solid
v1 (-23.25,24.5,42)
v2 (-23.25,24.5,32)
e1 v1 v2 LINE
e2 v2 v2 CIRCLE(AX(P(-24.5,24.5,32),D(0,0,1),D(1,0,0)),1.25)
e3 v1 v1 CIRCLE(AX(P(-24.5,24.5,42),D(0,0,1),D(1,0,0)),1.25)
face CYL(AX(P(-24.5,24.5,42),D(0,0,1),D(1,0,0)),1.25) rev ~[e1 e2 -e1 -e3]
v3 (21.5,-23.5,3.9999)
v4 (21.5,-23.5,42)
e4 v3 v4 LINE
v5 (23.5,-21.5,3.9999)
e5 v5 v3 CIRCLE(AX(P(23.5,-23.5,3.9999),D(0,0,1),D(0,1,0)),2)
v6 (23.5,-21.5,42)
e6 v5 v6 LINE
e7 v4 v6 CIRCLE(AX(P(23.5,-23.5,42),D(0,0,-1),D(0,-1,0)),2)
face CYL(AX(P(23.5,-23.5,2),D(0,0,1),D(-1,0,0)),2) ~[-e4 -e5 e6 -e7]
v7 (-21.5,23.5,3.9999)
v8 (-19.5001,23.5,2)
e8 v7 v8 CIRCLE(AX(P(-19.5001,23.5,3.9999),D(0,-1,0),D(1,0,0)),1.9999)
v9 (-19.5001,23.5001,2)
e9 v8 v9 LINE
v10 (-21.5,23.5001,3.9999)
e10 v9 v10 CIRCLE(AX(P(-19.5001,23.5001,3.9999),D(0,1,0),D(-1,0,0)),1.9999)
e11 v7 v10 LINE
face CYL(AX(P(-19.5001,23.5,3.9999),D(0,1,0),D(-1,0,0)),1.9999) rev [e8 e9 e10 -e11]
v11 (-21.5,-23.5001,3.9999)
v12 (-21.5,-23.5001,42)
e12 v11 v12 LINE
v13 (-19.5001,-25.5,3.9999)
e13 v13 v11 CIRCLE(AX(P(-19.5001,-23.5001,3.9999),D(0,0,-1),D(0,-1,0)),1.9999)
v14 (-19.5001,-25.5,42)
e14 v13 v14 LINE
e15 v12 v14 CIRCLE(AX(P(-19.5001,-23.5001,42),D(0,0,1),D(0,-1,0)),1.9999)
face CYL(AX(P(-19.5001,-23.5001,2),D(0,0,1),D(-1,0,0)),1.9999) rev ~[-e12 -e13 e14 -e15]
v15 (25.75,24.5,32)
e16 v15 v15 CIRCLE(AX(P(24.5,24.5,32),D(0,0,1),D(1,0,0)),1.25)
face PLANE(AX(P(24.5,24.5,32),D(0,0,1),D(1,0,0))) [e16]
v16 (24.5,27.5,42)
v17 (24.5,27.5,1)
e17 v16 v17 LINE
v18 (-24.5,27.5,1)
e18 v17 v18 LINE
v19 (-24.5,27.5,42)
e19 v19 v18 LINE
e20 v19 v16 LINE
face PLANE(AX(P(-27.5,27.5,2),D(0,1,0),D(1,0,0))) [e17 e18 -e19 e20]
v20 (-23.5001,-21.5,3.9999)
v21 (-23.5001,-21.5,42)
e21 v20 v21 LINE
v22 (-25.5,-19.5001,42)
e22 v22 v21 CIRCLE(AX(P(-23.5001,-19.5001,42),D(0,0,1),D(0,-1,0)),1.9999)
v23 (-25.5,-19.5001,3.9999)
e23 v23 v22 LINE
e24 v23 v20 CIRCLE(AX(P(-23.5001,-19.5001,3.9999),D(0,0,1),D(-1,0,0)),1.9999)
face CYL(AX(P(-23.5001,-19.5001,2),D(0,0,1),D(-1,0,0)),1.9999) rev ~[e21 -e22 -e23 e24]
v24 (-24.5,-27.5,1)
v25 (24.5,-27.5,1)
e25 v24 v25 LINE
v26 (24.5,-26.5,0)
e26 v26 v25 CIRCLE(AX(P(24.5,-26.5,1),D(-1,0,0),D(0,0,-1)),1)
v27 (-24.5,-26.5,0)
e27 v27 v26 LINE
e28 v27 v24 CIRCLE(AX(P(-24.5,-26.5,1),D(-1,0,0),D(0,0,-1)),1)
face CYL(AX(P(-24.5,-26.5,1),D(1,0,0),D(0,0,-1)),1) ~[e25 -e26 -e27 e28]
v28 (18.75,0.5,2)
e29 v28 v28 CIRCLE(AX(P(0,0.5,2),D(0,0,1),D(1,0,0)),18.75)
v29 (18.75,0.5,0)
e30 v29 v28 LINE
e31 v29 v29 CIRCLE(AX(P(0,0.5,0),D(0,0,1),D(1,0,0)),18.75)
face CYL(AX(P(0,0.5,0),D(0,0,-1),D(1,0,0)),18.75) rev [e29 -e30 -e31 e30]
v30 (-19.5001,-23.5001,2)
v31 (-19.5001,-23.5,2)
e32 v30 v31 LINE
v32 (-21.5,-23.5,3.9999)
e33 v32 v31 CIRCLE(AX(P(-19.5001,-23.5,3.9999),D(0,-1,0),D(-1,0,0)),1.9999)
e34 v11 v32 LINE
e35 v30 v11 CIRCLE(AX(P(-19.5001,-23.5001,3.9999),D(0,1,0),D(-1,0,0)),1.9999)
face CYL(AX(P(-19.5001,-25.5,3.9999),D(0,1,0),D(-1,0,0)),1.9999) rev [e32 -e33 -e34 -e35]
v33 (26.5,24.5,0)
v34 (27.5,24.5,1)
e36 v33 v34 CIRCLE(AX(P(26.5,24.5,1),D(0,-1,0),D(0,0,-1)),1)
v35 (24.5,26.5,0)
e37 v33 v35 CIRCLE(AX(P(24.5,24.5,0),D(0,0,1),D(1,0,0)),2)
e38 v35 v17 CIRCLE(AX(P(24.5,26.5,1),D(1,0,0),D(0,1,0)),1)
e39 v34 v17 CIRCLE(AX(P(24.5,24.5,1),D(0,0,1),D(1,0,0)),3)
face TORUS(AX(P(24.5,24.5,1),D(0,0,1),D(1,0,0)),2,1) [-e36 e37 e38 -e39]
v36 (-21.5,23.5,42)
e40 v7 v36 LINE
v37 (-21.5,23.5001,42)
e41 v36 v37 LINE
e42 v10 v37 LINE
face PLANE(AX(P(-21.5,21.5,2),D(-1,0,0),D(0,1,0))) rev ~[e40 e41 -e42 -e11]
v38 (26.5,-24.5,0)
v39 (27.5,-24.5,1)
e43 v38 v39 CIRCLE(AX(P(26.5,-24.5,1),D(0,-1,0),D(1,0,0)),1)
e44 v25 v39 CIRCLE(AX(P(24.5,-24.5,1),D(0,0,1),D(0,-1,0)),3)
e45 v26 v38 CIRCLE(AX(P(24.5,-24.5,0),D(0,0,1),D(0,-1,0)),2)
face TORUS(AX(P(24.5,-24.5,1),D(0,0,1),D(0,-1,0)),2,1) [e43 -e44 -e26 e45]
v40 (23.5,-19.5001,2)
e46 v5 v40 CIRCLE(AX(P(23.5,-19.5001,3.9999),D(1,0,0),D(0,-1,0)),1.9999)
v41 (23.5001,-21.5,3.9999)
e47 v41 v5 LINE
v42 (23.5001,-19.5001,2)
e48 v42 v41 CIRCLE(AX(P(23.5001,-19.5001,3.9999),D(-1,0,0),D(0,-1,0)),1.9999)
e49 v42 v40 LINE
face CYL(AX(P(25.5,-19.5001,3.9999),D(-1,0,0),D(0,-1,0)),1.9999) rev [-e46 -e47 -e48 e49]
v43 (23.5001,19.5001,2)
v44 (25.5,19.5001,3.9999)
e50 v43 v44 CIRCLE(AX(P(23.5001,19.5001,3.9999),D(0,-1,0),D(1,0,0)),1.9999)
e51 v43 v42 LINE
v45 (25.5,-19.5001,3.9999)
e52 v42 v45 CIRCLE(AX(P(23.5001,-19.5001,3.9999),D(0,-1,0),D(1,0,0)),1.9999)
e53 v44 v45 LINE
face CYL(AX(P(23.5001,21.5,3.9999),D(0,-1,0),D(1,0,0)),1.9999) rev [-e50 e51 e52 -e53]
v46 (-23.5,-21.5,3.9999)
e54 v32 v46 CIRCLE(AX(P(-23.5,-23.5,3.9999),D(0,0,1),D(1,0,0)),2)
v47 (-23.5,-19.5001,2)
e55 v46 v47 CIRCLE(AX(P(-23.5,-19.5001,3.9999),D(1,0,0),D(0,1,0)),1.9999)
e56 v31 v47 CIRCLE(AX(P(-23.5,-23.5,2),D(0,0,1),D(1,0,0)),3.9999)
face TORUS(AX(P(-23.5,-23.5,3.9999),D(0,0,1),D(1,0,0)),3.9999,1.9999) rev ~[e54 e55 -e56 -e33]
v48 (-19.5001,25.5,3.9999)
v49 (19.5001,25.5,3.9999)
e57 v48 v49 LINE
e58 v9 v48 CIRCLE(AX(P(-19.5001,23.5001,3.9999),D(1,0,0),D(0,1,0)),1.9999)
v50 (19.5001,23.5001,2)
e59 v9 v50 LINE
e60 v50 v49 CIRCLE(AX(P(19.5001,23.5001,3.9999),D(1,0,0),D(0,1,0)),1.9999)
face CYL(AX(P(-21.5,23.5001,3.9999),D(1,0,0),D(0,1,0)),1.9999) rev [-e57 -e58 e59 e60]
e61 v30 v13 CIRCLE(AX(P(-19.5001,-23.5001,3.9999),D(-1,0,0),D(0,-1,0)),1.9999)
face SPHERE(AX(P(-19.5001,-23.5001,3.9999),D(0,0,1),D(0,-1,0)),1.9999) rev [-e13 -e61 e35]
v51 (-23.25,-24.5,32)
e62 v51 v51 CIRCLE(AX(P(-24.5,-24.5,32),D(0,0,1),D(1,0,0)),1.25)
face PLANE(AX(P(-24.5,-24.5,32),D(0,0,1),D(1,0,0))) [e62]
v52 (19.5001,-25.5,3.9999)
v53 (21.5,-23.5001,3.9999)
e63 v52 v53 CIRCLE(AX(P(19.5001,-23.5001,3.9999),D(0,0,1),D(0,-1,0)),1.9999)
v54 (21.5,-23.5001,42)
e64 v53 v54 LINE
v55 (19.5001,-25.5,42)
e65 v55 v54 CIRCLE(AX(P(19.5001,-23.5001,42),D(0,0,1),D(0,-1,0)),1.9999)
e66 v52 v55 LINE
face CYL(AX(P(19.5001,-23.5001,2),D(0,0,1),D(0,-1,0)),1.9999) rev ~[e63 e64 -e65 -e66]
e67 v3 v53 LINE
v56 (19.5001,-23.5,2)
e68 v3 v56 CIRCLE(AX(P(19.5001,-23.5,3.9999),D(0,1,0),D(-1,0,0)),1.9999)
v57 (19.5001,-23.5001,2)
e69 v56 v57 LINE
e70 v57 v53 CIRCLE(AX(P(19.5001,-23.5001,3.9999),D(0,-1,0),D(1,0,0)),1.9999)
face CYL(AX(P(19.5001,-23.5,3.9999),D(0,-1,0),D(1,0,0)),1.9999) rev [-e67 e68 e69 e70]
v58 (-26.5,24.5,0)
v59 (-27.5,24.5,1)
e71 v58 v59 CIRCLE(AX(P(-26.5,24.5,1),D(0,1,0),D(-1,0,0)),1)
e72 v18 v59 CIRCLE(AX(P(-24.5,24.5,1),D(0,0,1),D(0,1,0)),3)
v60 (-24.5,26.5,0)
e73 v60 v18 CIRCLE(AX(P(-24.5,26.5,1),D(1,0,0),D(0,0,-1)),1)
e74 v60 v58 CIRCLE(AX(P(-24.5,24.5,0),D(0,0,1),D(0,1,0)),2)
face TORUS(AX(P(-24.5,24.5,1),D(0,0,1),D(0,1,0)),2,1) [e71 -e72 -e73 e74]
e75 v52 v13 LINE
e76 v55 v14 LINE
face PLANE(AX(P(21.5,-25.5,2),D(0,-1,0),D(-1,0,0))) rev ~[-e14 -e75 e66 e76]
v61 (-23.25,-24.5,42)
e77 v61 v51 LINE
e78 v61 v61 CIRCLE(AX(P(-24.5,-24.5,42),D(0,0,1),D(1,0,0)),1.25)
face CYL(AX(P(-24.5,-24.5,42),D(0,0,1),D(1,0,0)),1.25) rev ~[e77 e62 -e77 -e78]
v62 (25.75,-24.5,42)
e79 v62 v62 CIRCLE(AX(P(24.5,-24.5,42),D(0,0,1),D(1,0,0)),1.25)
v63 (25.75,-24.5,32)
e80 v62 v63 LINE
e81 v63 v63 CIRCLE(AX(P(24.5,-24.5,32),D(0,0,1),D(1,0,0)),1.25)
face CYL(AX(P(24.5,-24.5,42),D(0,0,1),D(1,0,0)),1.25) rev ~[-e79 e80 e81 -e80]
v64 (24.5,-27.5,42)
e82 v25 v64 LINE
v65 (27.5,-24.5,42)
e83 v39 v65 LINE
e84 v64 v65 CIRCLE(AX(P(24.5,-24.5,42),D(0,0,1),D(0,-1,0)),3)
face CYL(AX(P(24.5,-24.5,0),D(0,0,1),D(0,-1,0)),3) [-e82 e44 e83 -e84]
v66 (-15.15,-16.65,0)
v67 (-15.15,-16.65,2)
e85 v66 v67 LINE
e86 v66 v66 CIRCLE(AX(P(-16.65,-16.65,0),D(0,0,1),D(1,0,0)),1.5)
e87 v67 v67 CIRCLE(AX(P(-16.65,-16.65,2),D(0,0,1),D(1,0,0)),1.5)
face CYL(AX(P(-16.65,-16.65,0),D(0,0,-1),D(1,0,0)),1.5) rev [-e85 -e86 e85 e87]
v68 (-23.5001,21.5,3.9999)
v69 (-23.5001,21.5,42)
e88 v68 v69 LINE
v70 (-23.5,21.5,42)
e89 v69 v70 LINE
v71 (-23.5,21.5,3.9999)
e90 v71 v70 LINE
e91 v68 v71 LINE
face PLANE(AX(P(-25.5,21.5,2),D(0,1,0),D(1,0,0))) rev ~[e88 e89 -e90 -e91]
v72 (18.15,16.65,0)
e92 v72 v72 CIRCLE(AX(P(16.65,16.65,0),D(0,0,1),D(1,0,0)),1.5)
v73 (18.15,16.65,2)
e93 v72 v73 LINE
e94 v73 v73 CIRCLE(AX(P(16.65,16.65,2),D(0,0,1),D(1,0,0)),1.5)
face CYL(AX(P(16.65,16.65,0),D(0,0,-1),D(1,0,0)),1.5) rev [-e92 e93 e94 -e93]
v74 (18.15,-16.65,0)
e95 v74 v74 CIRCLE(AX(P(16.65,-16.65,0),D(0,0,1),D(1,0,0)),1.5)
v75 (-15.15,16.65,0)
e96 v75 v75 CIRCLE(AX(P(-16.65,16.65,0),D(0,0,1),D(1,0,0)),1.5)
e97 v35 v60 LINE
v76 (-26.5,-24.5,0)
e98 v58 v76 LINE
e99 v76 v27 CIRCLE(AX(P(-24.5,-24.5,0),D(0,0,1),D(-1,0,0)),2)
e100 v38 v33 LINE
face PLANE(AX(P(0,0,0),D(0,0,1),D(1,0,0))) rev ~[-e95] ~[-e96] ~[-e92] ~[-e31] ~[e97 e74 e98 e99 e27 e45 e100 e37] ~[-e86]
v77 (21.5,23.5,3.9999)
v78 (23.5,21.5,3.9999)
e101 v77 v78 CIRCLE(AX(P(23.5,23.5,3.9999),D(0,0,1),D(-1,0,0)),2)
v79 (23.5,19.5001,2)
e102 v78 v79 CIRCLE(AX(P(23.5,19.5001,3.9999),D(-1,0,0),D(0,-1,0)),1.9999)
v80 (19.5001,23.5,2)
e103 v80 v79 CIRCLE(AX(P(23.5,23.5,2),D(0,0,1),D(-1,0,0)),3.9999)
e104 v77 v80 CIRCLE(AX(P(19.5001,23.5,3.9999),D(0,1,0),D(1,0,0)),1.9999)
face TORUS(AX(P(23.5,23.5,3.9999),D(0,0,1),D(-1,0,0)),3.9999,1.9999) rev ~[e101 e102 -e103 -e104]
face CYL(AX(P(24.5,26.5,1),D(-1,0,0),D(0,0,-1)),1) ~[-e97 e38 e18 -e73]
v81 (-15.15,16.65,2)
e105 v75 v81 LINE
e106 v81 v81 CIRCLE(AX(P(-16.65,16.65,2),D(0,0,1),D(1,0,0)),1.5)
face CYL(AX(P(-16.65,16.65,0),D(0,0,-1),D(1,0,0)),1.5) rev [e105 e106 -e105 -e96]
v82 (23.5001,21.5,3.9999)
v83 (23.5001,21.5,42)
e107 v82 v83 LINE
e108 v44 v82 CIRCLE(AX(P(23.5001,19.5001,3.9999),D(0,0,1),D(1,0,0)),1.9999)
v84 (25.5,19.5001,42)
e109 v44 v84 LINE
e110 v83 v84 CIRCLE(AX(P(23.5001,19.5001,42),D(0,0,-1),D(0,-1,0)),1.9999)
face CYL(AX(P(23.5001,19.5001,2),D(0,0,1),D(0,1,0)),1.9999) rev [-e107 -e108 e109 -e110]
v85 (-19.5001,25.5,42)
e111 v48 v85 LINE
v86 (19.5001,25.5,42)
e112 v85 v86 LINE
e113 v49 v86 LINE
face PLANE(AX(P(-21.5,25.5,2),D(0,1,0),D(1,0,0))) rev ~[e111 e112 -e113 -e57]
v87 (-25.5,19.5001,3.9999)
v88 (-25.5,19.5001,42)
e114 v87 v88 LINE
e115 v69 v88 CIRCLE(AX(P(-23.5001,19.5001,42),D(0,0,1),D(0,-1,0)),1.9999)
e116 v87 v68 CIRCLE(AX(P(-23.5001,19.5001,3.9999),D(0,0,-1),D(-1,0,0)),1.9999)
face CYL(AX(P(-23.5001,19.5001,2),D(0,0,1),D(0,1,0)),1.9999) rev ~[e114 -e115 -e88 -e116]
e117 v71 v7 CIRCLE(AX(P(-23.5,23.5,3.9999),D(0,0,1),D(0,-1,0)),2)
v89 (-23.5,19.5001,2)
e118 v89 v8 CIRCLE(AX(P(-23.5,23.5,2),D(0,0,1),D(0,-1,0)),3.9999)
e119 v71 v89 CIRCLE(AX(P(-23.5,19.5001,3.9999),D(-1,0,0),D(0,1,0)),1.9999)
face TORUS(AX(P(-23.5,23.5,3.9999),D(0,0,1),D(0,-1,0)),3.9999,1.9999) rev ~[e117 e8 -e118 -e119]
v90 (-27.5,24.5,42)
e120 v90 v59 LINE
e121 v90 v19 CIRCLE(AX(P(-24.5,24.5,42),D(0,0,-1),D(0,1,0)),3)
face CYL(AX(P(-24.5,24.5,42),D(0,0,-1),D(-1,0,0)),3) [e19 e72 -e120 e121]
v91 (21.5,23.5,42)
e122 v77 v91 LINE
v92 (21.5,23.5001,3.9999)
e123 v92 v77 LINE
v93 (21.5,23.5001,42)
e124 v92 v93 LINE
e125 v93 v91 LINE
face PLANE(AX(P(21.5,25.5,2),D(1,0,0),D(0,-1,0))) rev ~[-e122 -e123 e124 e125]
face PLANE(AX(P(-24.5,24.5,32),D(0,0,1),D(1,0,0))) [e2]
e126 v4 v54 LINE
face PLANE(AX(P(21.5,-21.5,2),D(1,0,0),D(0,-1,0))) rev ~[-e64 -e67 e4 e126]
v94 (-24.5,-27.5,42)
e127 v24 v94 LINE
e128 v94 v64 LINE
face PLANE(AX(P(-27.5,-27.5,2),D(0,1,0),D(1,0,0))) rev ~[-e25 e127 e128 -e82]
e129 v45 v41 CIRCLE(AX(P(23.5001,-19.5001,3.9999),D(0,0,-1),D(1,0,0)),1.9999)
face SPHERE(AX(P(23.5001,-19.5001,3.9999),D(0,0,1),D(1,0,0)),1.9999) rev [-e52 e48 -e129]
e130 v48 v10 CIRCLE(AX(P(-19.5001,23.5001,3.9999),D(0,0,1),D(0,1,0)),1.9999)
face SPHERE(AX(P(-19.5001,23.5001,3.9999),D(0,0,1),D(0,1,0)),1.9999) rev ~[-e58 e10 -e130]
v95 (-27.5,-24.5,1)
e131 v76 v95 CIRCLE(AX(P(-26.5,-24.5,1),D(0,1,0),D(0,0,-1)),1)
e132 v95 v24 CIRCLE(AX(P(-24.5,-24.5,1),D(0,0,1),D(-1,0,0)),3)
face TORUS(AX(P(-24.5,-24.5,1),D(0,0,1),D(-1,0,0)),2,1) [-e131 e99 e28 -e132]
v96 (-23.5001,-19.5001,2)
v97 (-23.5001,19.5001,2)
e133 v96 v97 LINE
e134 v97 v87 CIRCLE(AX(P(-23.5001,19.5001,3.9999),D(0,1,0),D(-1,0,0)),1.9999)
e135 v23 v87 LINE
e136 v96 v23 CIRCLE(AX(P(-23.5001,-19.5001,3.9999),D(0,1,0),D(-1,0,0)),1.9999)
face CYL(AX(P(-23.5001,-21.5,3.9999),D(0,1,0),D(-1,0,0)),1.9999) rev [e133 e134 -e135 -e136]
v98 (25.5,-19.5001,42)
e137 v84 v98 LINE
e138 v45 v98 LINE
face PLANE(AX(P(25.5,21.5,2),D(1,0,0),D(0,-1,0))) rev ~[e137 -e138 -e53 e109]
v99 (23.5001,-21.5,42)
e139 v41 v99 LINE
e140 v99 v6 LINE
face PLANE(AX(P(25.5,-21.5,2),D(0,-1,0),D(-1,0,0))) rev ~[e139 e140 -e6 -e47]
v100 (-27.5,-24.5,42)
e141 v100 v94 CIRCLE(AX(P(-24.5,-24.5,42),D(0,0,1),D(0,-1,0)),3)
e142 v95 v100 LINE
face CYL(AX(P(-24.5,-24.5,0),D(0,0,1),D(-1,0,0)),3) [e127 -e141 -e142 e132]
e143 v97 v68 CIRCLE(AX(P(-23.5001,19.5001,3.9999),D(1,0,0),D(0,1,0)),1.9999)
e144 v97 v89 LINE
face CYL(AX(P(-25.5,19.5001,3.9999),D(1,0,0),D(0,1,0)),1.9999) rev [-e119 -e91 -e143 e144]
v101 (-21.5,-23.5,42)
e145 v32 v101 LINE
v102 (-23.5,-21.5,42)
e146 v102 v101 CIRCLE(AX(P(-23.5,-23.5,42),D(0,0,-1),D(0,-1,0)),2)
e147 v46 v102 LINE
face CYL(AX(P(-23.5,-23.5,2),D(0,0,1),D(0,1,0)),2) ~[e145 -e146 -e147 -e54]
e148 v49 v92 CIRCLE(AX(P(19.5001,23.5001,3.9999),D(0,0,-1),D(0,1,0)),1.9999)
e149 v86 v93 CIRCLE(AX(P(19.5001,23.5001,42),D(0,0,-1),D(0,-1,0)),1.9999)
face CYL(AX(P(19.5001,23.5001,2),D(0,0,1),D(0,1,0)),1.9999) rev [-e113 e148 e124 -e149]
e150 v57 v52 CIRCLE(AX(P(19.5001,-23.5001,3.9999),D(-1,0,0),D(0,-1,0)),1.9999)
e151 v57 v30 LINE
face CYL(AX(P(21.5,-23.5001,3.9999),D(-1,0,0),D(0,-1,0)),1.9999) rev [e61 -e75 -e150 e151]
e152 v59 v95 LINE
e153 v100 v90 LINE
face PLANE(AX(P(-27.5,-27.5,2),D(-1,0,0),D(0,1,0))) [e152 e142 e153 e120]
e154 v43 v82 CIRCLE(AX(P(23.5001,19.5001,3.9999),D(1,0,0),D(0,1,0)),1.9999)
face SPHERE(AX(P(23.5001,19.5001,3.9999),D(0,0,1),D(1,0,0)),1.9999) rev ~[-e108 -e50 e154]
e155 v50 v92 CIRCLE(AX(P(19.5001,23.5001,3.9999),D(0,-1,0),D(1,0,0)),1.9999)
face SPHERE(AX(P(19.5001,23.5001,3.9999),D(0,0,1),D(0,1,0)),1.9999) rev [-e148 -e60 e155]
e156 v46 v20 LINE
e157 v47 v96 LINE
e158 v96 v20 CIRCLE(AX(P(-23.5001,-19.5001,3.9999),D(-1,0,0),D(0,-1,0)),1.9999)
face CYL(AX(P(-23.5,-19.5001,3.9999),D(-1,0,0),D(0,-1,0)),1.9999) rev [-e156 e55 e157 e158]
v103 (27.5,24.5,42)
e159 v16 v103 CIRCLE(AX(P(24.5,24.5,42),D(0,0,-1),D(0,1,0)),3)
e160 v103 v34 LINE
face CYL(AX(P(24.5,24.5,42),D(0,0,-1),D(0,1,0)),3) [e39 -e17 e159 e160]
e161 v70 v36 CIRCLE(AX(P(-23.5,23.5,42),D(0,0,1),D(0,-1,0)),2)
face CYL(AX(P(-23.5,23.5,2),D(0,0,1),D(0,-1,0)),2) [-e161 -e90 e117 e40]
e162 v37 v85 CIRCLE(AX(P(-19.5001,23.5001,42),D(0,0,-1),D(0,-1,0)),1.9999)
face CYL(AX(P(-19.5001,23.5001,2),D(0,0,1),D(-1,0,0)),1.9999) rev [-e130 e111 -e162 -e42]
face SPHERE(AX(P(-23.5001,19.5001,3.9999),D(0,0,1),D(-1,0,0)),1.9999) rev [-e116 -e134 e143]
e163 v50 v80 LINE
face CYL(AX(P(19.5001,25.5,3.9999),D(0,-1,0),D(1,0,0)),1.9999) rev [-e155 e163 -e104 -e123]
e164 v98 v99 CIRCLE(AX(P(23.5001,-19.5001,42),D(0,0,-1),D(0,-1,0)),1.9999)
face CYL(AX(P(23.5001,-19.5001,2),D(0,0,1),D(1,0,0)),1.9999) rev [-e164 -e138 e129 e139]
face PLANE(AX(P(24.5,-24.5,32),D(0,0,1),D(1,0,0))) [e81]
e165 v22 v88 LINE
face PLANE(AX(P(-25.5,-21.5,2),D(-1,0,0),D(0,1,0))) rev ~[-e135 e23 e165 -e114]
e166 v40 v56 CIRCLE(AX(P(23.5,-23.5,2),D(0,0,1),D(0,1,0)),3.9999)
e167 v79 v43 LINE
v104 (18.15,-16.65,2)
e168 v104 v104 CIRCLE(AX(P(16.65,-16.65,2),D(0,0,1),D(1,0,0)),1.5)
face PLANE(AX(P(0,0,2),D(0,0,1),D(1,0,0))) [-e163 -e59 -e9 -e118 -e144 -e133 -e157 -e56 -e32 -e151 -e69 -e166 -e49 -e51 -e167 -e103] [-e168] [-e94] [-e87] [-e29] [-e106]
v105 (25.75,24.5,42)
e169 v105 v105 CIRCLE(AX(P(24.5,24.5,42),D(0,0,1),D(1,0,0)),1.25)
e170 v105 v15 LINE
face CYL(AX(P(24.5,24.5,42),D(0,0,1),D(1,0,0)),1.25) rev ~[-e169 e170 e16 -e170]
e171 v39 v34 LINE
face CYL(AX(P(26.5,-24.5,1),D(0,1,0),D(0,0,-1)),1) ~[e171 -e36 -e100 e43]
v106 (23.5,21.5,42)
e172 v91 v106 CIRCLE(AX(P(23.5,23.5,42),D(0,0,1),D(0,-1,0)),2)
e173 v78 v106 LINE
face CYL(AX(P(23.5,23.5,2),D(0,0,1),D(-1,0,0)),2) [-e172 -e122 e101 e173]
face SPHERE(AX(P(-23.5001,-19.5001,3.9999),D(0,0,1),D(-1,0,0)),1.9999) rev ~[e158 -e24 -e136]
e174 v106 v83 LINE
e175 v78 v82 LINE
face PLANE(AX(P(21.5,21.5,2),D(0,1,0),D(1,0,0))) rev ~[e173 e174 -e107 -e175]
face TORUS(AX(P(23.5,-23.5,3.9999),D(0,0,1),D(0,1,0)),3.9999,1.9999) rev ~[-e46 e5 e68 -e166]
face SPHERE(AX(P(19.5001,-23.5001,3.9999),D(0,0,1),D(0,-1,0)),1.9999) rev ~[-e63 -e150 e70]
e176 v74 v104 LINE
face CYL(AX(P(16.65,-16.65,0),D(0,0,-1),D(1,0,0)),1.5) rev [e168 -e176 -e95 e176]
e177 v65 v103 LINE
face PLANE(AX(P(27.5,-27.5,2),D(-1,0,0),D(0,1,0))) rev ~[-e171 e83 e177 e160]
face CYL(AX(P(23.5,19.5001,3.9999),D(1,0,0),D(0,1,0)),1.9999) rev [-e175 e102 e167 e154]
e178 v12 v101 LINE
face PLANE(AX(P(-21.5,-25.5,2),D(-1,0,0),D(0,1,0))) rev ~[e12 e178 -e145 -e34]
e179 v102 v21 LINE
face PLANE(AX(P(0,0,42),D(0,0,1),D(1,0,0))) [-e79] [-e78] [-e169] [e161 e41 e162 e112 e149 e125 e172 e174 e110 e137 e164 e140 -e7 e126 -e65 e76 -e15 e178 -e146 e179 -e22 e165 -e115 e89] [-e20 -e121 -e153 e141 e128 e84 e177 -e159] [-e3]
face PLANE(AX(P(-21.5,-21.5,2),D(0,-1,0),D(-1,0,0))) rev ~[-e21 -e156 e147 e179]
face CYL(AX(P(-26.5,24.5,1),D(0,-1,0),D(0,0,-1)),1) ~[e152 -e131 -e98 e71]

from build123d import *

# Parameters (mm, degrees)
F0_W     = 55
F0_H     = 55
F0_R     = 1.5
F0_R_2   = 18.75
F1_DEPTH = 2
F2_W     = 55
F2_H     = 55
F3_DEPTH = 40
F4_R     = 1.25
F5_DEPTH = 10
F6_R     = 3
F7_R     = 1
F8_F1_R  = 2
F8_F2_R  = 1.9999


# Not quite as in the source:
# - a fillet or chamfer is up to 0.001 mm smaller than in the source, because OpenCascade refuses the exact size


with BuildPart() as f1:
    # F0 (on Top) → F1 (new body)
    with BuildSketch(Plane.XY):
        Rectangle(F0_W, F0_H)
        with Locations((-16.65, -16.65)):
            Circle(F0_R, mode=Mode.SUBTRACT)
        with Locations((16.65, -16.65)):
            Circle(F0_R, mode=Mode.SUBTRACT)
        with Locations((-16.65, 16.65)):
            Circle(F0_R, mode=Mode.SUBTRACT)
        with Locations((0, 0.5)):
            Circle(F0_R_2, mode=Mode.SUBTRACT)
        with Locations((16.65, 16.65)):
            Circle(F0_R, mode=Mode.SUBTRACT)
    extrude(amount=F1_DEPTH)

    # F2 (on face) → F3 (join)
    with BuildSketch(Plane.XY.offset(2)):
        Rectangle(F2_W, F2_H)
        Polygon((-21.5, 21.5), (-21.5, 25.5), (21.5, 25.5), (21.5, 21.5), (25.5, 21.5), (25.5, -21.5), (21.5, -21.5), (21.5, -25.5), (-21.5, -25.5), (-21.5, -21.5), (-25.5, -21.5), (-25.5, 21.5), align=None, mode=Mode.SUBTRACT)
    extrude(amount=F3_DEPTH)

    # F4 (on face) → F5 (cut)
    with BuildSketch(Plane.XY.offset(42)):
        with Locations((-24.5, 24.5)):
            Circle(F4_R)
        with Locations((-24.5, -24.5)):
            Circle(F4_R)
        with Locations((24.5, -24.5)):
            Circle(F4_R)
        with Locations((24.5, 24.5)):
            Circle(F4_R)
    extrude(amount=-F5_DEPTH, mode=Mode.SUBTRACT)

    # F6
    f6_edges = [f1.edges().sort_by_distance(p)[0] for p in [
        (-27.5, -27.5, 21),
        (27.5, -27.5, 21),
        (-27.5, 27.5, 21),
        (27.5, 27.5, 21),
    ]]
    fillet(f6_edges, radius=F6_R)

    # F7
    f7_edges = [f1.edges().sort_by_distance(p)[0] for p in [
        (0, -27.5, 0),
        (27.5, 0, 0),
        (26.62132, -26.62132, 0),
        (26.62132, 26.62132, 0),
        (0, 27.5, 0),
        (-26.62132, -26.62132, 0),
        (-26.62132, 26.62132, 0),
        (-27.5, 0, 0),
    ]]
    fillet(f7_edges, radius=F7_R)

    # F8: fillet of radius 2 on 20 edges, made by hand

    # F8_f1
    f8_f1_edges = [f1.edges().sort_by_distance(p)[0] for p in [
        (21.5, -21.5, 22),
        (-21.5, -21.5, 22),
        (-21.5, 21.5, 22),
        (21.5, 21.5, 22),
    ]]
    fillet(f8_f1_edges, radius=F8_F1_R)

    # F8_f2 (radius 2 in the source; OpenCascade refuses exactly that, so slightly less here)
    f8_f2_edges = [f1.edges().sort_by_distance(p)[0] for p in [
        (-21.5, -25.5, 22),
        (-25.5, -21.5, 22),
        (21.5, -25.5, 22),
        (25.5, -21.5, 22),
        (-25.5, 21.5, 22),
        (-21.5, 25.5, 22),
        (21.5, 25.5, 22),
        (25.5, 21.5, 22),
        (0, -25.5, 2),
        (25.5, 0, 2),
        (-25.5, 0, 2),
        (0, 25.5, 2),
        (-24.5, -21.5, 2),
        (-21.5, 24.5, 2),
        (21.5, -24.5, 2),
        (24.5, 21.5, 2),
        (22.0857864376, 22.0857864376, 2),
        (22.0857864376, -22.0857864376, 2),
        (-22.0857864376, 22.0857864376, 2),
        (-22.0857864376, -22.0857864376, 2),
    ]]
    fillet(f8_f2_edges, radius=F8_F2_R)


solid = f1.part
